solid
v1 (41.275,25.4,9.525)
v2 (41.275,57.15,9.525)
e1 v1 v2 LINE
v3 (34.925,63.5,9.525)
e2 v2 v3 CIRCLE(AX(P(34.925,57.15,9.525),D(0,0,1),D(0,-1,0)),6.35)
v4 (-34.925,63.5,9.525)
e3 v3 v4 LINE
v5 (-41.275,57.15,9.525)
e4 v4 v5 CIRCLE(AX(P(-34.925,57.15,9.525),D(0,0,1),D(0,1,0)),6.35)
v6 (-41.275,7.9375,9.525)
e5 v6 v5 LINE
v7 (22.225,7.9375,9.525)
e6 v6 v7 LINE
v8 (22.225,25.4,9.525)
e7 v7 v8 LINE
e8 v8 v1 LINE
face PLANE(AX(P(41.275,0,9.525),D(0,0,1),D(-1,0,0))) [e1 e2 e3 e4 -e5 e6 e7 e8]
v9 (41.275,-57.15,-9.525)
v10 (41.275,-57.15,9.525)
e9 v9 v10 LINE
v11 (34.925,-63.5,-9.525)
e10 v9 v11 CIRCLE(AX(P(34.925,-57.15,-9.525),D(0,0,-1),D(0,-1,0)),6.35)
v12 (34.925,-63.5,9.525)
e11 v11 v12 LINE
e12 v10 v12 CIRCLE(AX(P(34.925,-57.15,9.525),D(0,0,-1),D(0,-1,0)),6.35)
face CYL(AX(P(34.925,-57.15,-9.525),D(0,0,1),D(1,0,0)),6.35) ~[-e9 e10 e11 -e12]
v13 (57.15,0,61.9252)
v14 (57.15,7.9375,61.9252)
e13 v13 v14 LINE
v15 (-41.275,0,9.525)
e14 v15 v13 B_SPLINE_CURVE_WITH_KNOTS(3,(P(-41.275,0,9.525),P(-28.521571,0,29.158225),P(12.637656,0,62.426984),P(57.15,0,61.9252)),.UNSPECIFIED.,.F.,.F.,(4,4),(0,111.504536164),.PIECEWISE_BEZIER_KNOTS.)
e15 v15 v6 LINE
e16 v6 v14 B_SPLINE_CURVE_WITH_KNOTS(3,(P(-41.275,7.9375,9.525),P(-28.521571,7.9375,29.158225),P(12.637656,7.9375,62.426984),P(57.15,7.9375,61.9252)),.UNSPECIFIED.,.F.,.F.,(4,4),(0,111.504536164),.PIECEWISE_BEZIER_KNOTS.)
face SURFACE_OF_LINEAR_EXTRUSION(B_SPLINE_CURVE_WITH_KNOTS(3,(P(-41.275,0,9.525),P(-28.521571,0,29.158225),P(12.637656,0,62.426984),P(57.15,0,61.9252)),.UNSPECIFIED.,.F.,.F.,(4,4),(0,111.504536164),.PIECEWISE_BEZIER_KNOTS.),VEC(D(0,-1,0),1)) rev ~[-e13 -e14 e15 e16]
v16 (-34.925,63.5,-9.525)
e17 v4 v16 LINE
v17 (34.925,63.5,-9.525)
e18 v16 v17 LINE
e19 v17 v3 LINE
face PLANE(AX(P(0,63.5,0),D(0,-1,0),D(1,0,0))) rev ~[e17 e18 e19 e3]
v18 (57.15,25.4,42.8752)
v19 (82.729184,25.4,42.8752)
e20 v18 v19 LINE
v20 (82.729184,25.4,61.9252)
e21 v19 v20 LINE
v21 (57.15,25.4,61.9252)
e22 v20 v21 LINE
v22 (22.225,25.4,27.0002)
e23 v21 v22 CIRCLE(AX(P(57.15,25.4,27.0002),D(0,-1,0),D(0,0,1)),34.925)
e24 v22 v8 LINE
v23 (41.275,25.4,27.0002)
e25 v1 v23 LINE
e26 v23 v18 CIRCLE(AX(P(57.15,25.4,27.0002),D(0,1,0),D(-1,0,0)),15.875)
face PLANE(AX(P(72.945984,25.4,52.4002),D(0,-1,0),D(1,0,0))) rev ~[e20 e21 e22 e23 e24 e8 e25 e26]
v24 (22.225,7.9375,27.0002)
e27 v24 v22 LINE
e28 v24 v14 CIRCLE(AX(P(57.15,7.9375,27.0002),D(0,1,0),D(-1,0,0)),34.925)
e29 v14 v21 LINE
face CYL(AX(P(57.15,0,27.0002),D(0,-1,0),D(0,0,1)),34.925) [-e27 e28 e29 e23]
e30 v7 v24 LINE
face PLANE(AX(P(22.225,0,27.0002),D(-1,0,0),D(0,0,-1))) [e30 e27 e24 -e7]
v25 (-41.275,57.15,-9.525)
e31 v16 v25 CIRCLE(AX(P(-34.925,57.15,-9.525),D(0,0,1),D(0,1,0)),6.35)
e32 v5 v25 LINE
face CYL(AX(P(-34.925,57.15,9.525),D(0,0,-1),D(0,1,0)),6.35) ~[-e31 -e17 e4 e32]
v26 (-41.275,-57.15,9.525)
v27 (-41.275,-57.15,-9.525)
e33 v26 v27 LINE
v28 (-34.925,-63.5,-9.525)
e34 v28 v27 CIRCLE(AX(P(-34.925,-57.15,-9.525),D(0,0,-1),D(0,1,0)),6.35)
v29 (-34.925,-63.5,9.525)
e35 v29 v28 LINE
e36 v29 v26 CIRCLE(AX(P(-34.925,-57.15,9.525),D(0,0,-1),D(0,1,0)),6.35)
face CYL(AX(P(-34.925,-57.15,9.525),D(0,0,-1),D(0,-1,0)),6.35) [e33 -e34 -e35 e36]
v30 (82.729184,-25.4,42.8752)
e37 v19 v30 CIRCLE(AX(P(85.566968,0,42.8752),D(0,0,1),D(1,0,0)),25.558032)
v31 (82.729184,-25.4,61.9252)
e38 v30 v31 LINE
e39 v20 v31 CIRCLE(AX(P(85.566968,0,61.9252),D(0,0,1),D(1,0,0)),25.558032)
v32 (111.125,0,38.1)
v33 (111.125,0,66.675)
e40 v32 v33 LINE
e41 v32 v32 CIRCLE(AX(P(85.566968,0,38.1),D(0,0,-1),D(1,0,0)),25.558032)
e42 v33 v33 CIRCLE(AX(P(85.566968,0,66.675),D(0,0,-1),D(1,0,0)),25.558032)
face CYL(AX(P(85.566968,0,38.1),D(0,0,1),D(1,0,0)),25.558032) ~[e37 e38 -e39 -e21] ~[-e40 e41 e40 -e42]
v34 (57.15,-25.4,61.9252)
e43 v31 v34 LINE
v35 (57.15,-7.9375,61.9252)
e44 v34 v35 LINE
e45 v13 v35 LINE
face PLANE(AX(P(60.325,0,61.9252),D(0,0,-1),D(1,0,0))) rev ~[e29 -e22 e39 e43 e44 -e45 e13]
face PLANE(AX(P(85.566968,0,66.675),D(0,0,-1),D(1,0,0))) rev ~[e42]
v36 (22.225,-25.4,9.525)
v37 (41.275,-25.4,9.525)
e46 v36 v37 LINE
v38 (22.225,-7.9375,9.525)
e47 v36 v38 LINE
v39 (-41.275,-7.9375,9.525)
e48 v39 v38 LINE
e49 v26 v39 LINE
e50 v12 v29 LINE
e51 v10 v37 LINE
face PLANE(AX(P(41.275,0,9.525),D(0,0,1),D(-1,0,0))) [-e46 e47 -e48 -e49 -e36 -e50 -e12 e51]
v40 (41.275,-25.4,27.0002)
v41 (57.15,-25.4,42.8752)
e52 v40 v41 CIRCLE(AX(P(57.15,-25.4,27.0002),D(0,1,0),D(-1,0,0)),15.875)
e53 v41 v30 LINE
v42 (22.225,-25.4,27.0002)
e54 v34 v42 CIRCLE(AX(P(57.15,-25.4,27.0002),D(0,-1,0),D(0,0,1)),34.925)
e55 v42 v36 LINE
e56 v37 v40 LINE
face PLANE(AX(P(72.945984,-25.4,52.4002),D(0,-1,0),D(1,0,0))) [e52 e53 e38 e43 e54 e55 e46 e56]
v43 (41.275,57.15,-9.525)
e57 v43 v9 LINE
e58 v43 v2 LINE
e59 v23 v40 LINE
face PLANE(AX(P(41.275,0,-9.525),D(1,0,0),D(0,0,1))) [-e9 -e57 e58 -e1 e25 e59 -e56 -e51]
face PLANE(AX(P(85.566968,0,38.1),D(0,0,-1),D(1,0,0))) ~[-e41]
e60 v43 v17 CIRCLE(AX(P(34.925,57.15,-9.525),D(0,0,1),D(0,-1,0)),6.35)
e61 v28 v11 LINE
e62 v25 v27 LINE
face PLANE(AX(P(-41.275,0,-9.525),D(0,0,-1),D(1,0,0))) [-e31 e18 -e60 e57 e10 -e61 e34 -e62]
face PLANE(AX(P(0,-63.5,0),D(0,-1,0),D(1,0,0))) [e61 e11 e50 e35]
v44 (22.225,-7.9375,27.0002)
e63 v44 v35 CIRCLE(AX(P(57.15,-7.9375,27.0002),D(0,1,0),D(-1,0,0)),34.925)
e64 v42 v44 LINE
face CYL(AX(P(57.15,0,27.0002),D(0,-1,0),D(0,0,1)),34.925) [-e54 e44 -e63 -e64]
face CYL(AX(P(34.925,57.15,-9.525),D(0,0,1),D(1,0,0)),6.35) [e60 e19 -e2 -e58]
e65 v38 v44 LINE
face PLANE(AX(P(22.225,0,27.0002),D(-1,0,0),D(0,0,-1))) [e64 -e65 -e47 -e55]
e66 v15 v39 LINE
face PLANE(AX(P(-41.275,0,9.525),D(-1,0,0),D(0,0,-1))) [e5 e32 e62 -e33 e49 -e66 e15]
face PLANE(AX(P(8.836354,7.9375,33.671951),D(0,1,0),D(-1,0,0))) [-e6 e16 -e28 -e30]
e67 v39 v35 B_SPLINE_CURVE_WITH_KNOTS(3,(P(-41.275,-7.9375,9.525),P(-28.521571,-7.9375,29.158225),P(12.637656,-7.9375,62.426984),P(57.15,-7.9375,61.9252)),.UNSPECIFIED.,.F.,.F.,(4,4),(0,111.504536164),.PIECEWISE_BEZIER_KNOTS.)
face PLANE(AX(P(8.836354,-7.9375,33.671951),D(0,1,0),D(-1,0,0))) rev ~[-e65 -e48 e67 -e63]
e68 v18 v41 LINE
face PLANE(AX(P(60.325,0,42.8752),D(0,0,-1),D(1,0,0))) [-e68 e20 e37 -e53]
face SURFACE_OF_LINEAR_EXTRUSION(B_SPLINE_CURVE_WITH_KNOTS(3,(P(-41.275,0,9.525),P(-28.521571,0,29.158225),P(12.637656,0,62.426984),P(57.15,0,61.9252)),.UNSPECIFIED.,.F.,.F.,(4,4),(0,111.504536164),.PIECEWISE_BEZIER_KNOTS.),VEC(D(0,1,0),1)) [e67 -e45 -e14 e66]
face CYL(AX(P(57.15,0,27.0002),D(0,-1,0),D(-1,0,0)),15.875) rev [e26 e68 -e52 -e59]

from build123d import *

# Parameters (mm, degrees)
F1_DEPTH = 63.5
F2_DEPTH = 7.9375
F3_DEPTH = 25.4
F0_W     = 25.2419677258
F0_H     = 19.05
F4_DEPTH = 25.4
F6_R     = 6.35


# Not quite as in the source:
# - a feature names something its author has since deleted; it is built from what else it names


with BuildPart() as f1:
    # F0 (on Front) → F1 (new body, symmetric)
    with BuildSketch(Plane.XZ):
        Polygon((-41.275, 9.525), (-41.275, -9.525), (41.275, -9.525), (41.275, 9.525), (22.225, 9.525), align=None)
    extrude(amount=F1_DEPTH, both=True)

    # F0 (on Front) → F2 (join, symmetric)
    with BuildSketch(Plane.XZ):
        with BuildLine():
            add(Edge.make_bspline(
                [(-41.275, 9.525), (-28.5215713084, 29.158225283), (12.6376561821, 62.4269843102), (57.15, 61.9252)],
                knots=[0, 0, 0, 0, 111.5045361635, 111.5045361635, 111.5045361635, 111.5045361635], degree=3))
            Line((-41.275, 9.525), (22.225, 9.525))
            Line((22.225, 9.525), (22.225, 27.0002))
            ThreePointArc((22.225, 27.0002), (32.4542956671, 51.6959043329), (57.15, 61.9252))
        make_face()
    extrude(amount=F2_DEPTH, both=True)

    # F0 (on Front) → F3 (join, symmetric)
    with BuildSketch(Plane.XZ):
        with BuildLine():
            Line((22.225, 9.525), (41.275, 9.525))
            Line((41.275, 9.525), (41.275, 27.0002))
            ThreePointArc((41.275, 27.0002), (45.9246798487, 38.2255201513), (57.15, 42.8752))
            Line((57.15, 42.8752), (60.325, 42.8752))
            Line((60.325, 42.8752), (60.325, 61.9252))
            Line((60.325, 61.9252), (57.15, 61.9252))
            ThreePointArc((57.15, 61.9252), (32.4542956671, 51.6959043329), (22.225, 27.0002))
            Line((22.225, 27.0002), (22.225, 9.525))
        make_face()
    extrude(amount=F3_DEPTH, both=True)

    # F0 (on Front) → F4 (join, symmetric)
    with BuildSketch(Plane.XZ):
        with Locations((72.9459838629, 52.4002)):
            Rectangle(F0_W, F0_H)
    extrude(amount=F4_DEPTH, both=True)

    # F0 (on Front) → F5 (revolve)
    with BuildSketch(Plane.XZ):
        Polygon((85.5669677258, 66.675), (85.5669677258, 61.9252), (85.5669677258, 42.8752), (85.5669677258, 38.1), (111.125, 38.1), (111.125, 66.675), align=None)
    revolve(axis=Axis((85.5669677258, 0, 52.3875), (0, 0, -1)))

    # F6
    f6_edges = [f1.edges().sort_by_distance(p)[0] for p in [
        (-41.275, -63.5, 0),
        (41.275, -63.5, 0),
        (41.275, 63.5, 0),
        (-41.275, 63.5, 0),
    ]]
    fillet(f6_edges, radius=F6_R)


solid = f1.part
